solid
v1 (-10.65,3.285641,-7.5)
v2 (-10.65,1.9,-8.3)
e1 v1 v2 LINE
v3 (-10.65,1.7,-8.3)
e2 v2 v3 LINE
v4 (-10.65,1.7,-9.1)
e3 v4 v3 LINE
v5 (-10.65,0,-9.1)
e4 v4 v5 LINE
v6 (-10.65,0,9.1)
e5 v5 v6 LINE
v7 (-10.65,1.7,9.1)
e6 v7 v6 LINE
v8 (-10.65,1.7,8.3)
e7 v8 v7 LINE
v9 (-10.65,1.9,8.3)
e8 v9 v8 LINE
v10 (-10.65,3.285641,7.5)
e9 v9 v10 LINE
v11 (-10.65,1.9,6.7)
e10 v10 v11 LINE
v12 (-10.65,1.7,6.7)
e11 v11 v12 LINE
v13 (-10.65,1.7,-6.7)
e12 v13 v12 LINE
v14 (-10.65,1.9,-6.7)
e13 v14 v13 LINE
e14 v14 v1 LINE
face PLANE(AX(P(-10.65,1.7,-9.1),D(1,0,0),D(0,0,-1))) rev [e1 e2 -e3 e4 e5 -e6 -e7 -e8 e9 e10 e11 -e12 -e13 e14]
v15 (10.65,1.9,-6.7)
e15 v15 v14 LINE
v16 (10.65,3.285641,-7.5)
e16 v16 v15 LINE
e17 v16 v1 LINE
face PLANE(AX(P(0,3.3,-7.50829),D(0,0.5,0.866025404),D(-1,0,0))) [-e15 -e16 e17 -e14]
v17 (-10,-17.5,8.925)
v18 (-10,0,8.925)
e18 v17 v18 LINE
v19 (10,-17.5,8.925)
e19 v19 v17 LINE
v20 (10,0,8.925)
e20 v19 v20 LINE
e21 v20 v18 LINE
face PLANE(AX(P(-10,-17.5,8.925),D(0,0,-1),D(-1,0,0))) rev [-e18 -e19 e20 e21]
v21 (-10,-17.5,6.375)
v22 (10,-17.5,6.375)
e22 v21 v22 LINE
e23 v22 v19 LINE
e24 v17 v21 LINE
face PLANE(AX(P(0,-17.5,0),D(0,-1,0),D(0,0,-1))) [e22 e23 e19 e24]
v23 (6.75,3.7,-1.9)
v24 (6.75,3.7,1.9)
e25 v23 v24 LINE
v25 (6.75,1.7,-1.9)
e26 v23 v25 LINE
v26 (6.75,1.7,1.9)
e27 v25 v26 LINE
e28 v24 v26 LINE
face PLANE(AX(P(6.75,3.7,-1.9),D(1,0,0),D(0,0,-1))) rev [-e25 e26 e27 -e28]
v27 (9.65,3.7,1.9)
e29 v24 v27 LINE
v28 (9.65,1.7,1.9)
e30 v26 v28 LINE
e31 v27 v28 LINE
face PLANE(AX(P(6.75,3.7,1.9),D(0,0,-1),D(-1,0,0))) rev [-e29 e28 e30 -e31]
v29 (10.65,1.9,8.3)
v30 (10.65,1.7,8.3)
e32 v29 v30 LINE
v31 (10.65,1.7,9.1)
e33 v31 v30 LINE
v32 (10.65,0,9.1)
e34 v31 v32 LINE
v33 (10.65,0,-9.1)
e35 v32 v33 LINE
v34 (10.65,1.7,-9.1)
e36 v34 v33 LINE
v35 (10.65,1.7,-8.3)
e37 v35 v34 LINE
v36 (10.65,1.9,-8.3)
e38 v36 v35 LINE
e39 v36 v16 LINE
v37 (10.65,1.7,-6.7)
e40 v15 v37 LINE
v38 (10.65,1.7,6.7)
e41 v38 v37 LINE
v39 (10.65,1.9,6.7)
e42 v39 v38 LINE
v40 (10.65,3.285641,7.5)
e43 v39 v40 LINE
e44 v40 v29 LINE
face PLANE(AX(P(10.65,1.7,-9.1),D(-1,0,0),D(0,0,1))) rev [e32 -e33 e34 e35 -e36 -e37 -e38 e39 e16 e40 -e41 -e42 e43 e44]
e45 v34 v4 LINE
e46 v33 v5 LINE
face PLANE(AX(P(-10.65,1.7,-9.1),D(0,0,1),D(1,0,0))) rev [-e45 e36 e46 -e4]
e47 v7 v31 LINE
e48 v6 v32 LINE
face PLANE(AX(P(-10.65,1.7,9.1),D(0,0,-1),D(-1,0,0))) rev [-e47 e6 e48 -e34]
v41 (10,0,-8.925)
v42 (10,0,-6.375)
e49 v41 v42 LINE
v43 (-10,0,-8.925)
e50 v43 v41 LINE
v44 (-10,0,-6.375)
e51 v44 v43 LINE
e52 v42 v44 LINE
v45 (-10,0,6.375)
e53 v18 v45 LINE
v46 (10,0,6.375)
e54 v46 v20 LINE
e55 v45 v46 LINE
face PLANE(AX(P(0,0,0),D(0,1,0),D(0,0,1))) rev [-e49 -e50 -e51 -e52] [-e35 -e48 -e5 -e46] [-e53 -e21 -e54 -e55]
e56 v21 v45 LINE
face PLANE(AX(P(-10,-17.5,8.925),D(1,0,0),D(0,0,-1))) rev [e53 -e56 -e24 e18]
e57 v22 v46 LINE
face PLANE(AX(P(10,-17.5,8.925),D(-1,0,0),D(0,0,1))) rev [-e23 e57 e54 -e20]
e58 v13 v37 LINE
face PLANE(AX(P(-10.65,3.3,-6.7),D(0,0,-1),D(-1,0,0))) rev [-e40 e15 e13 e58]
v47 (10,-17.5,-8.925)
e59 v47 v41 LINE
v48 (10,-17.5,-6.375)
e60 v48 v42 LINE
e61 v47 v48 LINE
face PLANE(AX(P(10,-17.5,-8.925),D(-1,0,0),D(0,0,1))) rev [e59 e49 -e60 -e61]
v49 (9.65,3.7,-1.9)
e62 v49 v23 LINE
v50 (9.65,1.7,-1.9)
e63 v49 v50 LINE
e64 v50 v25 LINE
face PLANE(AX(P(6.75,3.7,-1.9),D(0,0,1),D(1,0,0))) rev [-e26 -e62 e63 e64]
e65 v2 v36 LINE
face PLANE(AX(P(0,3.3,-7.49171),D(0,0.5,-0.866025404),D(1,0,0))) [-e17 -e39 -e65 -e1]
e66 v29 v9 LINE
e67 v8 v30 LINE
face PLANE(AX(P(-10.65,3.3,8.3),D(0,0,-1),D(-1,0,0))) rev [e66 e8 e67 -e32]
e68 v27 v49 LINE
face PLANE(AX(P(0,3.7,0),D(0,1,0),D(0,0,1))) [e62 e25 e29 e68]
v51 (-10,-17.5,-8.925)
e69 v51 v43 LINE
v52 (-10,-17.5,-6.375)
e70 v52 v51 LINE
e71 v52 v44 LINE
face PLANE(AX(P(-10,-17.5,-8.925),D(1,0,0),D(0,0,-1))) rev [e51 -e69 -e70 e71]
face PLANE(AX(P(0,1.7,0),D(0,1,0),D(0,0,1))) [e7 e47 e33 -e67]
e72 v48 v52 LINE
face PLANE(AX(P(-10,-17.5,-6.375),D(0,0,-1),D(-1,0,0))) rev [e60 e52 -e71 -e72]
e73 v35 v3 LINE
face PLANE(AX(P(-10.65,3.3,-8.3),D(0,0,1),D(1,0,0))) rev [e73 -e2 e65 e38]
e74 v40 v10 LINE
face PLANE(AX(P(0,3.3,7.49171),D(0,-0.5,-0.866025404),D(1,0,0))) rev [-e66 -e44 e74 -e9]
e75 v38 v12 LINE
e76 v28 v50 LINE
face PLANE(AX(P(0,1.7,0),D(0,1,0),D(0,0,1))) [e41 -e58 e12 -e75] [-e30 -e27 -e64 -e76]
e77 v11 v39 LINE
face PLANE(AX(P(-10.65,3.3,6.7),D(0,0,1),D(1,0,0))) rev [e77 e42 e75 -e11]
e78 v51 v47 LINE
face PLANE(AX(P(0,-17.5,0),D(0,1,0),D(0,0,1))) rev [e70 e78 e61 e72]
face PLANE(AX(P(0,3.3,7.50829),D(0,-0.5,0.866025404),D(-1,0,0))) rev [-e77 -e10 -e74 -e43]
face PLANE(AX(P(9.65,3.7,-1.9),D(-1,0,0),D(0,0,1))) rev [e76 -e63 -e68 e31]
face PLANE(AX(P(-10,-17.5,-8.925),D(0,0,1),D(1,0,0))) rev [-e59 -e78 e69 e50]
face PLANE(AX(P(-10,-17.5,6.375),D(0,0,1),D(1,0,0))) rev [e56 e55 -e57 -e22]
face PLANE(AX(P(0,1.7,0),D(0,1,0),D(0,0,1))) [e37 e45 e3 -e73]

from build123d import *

# Parameters (mm, degrees)
SKETCH_2_W       = 21.3
SKETCH_2_H       = 18.2
EXTRUDE_1_DEPTH  = 1.7
SKETCH_4_W       = 21.3
SKETCH_4_H       = 1.6
EXTRUDE_2_DEPTH  = 1.6
CHAMFER_1_SIZE   = 1.4
CHAMFER_1_SIZE_2 = 0.808290377
SKETCH_5_W       = 2.9
SKETCH_5_H       = 3.8
EXTRUDE_3_DEPTH  = 2
SKETCH_6_W       = 20
SKETCH_6_H       = 2.55
EXTRUDE_4_DEPTH  = 17.5


with BuildPart() as part:
    # 草图2 → 凸台-拉伸1 (new body)
    with BuildSketch(Plane(origin=(0, 0, 0), x_dir=(1, 0, 0), z_dir=(0, 1, 0))):
        Rectangle(SKETCH_2_W, SKETCH_2_H)
    extrude(amount=EXTRUDE_1_DEPTH)

    # 草图4 → 凸台-拉伸2 (add)
    with BuildSketch(Plane(origin=(0, 1.7, 0), x_dir=(1, 0, 0), z_dir=(0, 1, 0))):
        with Locations((0, 7.5)):
            Rectangle(SKETCH_4_W, SKETCH_4_H)
        with Locations((0, -7.5)):
            Rectangle(SKETCH_4_W, SKETCH_4_H)
    extrude(amount=EXTRUDE_2_DEPTH)

    # 倒角1
    # the kernel refuses this chamfer: 1.4, 0.808290377 mm, written as the material it takes off along each edge
    with BuildSketch(Plane(origin=(14.271920057, 3.3, 8.3), x_dir=(0, -0.9998132206222079, 0.019326765612701028), z_dir=(-1, 0, 0)), Plane(origin=(-14.271920057, 3.3, 6.7), x_dir=(0, -0.9998132206222079, -0.019326765612701028), z_dir=(1, 0, 0)), Plane(origin=(14.271920057, 3.3, -6.7), x_dir=(0, -0.9998132206222079, 0.019326765612701028), z_dir=(-1, 0, 0)), Plane(origin=(-14.271920057, 3.3, -8.3), x_dir=(0, -0.9998132206222079, -0.019326765612701028), z_dir=(1, 0, 0))) as chamfer_1_piece_1:
        Polygon((CHAMFER_1_SIZE * 0.999813220622, -CHAMFER_1_SIZE * 0.0193267656127), (-CHAMFER_1_SIZE_2 * 0.0193267656095, -CHAMFER_1_SIZE_2 * 0.999813220456), (0, 0), align=None)
    extrude(amount=28.543840113, mode=Mode.SUBTRACT)

    # 草图5 → 凸台-拉伸3 (add)
    with BuildSketch(Plane(origin=(0, 1.7, 0), x_dir=(1, 0, 0), z_dir=(0, 1, 0))):
        with Locations((8.2, 0)):
            Rectangle(SKETCH_5_W, SKETCH_5_H)
    extrude(amount=EXTRUDE_3_DEPTH)

    # 草图6 → 凸台-拉伸4 (add)
    with BuildSketch(Plane.XZ):
        with Locations((0, -7.65)):
            Rectangle(SKETCH_6_W, SKETCH_6_H)
        with Locations((0, 7.65)):
            Rectangle(SKETCH_6_W, SKETCH_6_H)
    extrude(amount=EXTRUDE_4_DEPTH)


solid = part.part
